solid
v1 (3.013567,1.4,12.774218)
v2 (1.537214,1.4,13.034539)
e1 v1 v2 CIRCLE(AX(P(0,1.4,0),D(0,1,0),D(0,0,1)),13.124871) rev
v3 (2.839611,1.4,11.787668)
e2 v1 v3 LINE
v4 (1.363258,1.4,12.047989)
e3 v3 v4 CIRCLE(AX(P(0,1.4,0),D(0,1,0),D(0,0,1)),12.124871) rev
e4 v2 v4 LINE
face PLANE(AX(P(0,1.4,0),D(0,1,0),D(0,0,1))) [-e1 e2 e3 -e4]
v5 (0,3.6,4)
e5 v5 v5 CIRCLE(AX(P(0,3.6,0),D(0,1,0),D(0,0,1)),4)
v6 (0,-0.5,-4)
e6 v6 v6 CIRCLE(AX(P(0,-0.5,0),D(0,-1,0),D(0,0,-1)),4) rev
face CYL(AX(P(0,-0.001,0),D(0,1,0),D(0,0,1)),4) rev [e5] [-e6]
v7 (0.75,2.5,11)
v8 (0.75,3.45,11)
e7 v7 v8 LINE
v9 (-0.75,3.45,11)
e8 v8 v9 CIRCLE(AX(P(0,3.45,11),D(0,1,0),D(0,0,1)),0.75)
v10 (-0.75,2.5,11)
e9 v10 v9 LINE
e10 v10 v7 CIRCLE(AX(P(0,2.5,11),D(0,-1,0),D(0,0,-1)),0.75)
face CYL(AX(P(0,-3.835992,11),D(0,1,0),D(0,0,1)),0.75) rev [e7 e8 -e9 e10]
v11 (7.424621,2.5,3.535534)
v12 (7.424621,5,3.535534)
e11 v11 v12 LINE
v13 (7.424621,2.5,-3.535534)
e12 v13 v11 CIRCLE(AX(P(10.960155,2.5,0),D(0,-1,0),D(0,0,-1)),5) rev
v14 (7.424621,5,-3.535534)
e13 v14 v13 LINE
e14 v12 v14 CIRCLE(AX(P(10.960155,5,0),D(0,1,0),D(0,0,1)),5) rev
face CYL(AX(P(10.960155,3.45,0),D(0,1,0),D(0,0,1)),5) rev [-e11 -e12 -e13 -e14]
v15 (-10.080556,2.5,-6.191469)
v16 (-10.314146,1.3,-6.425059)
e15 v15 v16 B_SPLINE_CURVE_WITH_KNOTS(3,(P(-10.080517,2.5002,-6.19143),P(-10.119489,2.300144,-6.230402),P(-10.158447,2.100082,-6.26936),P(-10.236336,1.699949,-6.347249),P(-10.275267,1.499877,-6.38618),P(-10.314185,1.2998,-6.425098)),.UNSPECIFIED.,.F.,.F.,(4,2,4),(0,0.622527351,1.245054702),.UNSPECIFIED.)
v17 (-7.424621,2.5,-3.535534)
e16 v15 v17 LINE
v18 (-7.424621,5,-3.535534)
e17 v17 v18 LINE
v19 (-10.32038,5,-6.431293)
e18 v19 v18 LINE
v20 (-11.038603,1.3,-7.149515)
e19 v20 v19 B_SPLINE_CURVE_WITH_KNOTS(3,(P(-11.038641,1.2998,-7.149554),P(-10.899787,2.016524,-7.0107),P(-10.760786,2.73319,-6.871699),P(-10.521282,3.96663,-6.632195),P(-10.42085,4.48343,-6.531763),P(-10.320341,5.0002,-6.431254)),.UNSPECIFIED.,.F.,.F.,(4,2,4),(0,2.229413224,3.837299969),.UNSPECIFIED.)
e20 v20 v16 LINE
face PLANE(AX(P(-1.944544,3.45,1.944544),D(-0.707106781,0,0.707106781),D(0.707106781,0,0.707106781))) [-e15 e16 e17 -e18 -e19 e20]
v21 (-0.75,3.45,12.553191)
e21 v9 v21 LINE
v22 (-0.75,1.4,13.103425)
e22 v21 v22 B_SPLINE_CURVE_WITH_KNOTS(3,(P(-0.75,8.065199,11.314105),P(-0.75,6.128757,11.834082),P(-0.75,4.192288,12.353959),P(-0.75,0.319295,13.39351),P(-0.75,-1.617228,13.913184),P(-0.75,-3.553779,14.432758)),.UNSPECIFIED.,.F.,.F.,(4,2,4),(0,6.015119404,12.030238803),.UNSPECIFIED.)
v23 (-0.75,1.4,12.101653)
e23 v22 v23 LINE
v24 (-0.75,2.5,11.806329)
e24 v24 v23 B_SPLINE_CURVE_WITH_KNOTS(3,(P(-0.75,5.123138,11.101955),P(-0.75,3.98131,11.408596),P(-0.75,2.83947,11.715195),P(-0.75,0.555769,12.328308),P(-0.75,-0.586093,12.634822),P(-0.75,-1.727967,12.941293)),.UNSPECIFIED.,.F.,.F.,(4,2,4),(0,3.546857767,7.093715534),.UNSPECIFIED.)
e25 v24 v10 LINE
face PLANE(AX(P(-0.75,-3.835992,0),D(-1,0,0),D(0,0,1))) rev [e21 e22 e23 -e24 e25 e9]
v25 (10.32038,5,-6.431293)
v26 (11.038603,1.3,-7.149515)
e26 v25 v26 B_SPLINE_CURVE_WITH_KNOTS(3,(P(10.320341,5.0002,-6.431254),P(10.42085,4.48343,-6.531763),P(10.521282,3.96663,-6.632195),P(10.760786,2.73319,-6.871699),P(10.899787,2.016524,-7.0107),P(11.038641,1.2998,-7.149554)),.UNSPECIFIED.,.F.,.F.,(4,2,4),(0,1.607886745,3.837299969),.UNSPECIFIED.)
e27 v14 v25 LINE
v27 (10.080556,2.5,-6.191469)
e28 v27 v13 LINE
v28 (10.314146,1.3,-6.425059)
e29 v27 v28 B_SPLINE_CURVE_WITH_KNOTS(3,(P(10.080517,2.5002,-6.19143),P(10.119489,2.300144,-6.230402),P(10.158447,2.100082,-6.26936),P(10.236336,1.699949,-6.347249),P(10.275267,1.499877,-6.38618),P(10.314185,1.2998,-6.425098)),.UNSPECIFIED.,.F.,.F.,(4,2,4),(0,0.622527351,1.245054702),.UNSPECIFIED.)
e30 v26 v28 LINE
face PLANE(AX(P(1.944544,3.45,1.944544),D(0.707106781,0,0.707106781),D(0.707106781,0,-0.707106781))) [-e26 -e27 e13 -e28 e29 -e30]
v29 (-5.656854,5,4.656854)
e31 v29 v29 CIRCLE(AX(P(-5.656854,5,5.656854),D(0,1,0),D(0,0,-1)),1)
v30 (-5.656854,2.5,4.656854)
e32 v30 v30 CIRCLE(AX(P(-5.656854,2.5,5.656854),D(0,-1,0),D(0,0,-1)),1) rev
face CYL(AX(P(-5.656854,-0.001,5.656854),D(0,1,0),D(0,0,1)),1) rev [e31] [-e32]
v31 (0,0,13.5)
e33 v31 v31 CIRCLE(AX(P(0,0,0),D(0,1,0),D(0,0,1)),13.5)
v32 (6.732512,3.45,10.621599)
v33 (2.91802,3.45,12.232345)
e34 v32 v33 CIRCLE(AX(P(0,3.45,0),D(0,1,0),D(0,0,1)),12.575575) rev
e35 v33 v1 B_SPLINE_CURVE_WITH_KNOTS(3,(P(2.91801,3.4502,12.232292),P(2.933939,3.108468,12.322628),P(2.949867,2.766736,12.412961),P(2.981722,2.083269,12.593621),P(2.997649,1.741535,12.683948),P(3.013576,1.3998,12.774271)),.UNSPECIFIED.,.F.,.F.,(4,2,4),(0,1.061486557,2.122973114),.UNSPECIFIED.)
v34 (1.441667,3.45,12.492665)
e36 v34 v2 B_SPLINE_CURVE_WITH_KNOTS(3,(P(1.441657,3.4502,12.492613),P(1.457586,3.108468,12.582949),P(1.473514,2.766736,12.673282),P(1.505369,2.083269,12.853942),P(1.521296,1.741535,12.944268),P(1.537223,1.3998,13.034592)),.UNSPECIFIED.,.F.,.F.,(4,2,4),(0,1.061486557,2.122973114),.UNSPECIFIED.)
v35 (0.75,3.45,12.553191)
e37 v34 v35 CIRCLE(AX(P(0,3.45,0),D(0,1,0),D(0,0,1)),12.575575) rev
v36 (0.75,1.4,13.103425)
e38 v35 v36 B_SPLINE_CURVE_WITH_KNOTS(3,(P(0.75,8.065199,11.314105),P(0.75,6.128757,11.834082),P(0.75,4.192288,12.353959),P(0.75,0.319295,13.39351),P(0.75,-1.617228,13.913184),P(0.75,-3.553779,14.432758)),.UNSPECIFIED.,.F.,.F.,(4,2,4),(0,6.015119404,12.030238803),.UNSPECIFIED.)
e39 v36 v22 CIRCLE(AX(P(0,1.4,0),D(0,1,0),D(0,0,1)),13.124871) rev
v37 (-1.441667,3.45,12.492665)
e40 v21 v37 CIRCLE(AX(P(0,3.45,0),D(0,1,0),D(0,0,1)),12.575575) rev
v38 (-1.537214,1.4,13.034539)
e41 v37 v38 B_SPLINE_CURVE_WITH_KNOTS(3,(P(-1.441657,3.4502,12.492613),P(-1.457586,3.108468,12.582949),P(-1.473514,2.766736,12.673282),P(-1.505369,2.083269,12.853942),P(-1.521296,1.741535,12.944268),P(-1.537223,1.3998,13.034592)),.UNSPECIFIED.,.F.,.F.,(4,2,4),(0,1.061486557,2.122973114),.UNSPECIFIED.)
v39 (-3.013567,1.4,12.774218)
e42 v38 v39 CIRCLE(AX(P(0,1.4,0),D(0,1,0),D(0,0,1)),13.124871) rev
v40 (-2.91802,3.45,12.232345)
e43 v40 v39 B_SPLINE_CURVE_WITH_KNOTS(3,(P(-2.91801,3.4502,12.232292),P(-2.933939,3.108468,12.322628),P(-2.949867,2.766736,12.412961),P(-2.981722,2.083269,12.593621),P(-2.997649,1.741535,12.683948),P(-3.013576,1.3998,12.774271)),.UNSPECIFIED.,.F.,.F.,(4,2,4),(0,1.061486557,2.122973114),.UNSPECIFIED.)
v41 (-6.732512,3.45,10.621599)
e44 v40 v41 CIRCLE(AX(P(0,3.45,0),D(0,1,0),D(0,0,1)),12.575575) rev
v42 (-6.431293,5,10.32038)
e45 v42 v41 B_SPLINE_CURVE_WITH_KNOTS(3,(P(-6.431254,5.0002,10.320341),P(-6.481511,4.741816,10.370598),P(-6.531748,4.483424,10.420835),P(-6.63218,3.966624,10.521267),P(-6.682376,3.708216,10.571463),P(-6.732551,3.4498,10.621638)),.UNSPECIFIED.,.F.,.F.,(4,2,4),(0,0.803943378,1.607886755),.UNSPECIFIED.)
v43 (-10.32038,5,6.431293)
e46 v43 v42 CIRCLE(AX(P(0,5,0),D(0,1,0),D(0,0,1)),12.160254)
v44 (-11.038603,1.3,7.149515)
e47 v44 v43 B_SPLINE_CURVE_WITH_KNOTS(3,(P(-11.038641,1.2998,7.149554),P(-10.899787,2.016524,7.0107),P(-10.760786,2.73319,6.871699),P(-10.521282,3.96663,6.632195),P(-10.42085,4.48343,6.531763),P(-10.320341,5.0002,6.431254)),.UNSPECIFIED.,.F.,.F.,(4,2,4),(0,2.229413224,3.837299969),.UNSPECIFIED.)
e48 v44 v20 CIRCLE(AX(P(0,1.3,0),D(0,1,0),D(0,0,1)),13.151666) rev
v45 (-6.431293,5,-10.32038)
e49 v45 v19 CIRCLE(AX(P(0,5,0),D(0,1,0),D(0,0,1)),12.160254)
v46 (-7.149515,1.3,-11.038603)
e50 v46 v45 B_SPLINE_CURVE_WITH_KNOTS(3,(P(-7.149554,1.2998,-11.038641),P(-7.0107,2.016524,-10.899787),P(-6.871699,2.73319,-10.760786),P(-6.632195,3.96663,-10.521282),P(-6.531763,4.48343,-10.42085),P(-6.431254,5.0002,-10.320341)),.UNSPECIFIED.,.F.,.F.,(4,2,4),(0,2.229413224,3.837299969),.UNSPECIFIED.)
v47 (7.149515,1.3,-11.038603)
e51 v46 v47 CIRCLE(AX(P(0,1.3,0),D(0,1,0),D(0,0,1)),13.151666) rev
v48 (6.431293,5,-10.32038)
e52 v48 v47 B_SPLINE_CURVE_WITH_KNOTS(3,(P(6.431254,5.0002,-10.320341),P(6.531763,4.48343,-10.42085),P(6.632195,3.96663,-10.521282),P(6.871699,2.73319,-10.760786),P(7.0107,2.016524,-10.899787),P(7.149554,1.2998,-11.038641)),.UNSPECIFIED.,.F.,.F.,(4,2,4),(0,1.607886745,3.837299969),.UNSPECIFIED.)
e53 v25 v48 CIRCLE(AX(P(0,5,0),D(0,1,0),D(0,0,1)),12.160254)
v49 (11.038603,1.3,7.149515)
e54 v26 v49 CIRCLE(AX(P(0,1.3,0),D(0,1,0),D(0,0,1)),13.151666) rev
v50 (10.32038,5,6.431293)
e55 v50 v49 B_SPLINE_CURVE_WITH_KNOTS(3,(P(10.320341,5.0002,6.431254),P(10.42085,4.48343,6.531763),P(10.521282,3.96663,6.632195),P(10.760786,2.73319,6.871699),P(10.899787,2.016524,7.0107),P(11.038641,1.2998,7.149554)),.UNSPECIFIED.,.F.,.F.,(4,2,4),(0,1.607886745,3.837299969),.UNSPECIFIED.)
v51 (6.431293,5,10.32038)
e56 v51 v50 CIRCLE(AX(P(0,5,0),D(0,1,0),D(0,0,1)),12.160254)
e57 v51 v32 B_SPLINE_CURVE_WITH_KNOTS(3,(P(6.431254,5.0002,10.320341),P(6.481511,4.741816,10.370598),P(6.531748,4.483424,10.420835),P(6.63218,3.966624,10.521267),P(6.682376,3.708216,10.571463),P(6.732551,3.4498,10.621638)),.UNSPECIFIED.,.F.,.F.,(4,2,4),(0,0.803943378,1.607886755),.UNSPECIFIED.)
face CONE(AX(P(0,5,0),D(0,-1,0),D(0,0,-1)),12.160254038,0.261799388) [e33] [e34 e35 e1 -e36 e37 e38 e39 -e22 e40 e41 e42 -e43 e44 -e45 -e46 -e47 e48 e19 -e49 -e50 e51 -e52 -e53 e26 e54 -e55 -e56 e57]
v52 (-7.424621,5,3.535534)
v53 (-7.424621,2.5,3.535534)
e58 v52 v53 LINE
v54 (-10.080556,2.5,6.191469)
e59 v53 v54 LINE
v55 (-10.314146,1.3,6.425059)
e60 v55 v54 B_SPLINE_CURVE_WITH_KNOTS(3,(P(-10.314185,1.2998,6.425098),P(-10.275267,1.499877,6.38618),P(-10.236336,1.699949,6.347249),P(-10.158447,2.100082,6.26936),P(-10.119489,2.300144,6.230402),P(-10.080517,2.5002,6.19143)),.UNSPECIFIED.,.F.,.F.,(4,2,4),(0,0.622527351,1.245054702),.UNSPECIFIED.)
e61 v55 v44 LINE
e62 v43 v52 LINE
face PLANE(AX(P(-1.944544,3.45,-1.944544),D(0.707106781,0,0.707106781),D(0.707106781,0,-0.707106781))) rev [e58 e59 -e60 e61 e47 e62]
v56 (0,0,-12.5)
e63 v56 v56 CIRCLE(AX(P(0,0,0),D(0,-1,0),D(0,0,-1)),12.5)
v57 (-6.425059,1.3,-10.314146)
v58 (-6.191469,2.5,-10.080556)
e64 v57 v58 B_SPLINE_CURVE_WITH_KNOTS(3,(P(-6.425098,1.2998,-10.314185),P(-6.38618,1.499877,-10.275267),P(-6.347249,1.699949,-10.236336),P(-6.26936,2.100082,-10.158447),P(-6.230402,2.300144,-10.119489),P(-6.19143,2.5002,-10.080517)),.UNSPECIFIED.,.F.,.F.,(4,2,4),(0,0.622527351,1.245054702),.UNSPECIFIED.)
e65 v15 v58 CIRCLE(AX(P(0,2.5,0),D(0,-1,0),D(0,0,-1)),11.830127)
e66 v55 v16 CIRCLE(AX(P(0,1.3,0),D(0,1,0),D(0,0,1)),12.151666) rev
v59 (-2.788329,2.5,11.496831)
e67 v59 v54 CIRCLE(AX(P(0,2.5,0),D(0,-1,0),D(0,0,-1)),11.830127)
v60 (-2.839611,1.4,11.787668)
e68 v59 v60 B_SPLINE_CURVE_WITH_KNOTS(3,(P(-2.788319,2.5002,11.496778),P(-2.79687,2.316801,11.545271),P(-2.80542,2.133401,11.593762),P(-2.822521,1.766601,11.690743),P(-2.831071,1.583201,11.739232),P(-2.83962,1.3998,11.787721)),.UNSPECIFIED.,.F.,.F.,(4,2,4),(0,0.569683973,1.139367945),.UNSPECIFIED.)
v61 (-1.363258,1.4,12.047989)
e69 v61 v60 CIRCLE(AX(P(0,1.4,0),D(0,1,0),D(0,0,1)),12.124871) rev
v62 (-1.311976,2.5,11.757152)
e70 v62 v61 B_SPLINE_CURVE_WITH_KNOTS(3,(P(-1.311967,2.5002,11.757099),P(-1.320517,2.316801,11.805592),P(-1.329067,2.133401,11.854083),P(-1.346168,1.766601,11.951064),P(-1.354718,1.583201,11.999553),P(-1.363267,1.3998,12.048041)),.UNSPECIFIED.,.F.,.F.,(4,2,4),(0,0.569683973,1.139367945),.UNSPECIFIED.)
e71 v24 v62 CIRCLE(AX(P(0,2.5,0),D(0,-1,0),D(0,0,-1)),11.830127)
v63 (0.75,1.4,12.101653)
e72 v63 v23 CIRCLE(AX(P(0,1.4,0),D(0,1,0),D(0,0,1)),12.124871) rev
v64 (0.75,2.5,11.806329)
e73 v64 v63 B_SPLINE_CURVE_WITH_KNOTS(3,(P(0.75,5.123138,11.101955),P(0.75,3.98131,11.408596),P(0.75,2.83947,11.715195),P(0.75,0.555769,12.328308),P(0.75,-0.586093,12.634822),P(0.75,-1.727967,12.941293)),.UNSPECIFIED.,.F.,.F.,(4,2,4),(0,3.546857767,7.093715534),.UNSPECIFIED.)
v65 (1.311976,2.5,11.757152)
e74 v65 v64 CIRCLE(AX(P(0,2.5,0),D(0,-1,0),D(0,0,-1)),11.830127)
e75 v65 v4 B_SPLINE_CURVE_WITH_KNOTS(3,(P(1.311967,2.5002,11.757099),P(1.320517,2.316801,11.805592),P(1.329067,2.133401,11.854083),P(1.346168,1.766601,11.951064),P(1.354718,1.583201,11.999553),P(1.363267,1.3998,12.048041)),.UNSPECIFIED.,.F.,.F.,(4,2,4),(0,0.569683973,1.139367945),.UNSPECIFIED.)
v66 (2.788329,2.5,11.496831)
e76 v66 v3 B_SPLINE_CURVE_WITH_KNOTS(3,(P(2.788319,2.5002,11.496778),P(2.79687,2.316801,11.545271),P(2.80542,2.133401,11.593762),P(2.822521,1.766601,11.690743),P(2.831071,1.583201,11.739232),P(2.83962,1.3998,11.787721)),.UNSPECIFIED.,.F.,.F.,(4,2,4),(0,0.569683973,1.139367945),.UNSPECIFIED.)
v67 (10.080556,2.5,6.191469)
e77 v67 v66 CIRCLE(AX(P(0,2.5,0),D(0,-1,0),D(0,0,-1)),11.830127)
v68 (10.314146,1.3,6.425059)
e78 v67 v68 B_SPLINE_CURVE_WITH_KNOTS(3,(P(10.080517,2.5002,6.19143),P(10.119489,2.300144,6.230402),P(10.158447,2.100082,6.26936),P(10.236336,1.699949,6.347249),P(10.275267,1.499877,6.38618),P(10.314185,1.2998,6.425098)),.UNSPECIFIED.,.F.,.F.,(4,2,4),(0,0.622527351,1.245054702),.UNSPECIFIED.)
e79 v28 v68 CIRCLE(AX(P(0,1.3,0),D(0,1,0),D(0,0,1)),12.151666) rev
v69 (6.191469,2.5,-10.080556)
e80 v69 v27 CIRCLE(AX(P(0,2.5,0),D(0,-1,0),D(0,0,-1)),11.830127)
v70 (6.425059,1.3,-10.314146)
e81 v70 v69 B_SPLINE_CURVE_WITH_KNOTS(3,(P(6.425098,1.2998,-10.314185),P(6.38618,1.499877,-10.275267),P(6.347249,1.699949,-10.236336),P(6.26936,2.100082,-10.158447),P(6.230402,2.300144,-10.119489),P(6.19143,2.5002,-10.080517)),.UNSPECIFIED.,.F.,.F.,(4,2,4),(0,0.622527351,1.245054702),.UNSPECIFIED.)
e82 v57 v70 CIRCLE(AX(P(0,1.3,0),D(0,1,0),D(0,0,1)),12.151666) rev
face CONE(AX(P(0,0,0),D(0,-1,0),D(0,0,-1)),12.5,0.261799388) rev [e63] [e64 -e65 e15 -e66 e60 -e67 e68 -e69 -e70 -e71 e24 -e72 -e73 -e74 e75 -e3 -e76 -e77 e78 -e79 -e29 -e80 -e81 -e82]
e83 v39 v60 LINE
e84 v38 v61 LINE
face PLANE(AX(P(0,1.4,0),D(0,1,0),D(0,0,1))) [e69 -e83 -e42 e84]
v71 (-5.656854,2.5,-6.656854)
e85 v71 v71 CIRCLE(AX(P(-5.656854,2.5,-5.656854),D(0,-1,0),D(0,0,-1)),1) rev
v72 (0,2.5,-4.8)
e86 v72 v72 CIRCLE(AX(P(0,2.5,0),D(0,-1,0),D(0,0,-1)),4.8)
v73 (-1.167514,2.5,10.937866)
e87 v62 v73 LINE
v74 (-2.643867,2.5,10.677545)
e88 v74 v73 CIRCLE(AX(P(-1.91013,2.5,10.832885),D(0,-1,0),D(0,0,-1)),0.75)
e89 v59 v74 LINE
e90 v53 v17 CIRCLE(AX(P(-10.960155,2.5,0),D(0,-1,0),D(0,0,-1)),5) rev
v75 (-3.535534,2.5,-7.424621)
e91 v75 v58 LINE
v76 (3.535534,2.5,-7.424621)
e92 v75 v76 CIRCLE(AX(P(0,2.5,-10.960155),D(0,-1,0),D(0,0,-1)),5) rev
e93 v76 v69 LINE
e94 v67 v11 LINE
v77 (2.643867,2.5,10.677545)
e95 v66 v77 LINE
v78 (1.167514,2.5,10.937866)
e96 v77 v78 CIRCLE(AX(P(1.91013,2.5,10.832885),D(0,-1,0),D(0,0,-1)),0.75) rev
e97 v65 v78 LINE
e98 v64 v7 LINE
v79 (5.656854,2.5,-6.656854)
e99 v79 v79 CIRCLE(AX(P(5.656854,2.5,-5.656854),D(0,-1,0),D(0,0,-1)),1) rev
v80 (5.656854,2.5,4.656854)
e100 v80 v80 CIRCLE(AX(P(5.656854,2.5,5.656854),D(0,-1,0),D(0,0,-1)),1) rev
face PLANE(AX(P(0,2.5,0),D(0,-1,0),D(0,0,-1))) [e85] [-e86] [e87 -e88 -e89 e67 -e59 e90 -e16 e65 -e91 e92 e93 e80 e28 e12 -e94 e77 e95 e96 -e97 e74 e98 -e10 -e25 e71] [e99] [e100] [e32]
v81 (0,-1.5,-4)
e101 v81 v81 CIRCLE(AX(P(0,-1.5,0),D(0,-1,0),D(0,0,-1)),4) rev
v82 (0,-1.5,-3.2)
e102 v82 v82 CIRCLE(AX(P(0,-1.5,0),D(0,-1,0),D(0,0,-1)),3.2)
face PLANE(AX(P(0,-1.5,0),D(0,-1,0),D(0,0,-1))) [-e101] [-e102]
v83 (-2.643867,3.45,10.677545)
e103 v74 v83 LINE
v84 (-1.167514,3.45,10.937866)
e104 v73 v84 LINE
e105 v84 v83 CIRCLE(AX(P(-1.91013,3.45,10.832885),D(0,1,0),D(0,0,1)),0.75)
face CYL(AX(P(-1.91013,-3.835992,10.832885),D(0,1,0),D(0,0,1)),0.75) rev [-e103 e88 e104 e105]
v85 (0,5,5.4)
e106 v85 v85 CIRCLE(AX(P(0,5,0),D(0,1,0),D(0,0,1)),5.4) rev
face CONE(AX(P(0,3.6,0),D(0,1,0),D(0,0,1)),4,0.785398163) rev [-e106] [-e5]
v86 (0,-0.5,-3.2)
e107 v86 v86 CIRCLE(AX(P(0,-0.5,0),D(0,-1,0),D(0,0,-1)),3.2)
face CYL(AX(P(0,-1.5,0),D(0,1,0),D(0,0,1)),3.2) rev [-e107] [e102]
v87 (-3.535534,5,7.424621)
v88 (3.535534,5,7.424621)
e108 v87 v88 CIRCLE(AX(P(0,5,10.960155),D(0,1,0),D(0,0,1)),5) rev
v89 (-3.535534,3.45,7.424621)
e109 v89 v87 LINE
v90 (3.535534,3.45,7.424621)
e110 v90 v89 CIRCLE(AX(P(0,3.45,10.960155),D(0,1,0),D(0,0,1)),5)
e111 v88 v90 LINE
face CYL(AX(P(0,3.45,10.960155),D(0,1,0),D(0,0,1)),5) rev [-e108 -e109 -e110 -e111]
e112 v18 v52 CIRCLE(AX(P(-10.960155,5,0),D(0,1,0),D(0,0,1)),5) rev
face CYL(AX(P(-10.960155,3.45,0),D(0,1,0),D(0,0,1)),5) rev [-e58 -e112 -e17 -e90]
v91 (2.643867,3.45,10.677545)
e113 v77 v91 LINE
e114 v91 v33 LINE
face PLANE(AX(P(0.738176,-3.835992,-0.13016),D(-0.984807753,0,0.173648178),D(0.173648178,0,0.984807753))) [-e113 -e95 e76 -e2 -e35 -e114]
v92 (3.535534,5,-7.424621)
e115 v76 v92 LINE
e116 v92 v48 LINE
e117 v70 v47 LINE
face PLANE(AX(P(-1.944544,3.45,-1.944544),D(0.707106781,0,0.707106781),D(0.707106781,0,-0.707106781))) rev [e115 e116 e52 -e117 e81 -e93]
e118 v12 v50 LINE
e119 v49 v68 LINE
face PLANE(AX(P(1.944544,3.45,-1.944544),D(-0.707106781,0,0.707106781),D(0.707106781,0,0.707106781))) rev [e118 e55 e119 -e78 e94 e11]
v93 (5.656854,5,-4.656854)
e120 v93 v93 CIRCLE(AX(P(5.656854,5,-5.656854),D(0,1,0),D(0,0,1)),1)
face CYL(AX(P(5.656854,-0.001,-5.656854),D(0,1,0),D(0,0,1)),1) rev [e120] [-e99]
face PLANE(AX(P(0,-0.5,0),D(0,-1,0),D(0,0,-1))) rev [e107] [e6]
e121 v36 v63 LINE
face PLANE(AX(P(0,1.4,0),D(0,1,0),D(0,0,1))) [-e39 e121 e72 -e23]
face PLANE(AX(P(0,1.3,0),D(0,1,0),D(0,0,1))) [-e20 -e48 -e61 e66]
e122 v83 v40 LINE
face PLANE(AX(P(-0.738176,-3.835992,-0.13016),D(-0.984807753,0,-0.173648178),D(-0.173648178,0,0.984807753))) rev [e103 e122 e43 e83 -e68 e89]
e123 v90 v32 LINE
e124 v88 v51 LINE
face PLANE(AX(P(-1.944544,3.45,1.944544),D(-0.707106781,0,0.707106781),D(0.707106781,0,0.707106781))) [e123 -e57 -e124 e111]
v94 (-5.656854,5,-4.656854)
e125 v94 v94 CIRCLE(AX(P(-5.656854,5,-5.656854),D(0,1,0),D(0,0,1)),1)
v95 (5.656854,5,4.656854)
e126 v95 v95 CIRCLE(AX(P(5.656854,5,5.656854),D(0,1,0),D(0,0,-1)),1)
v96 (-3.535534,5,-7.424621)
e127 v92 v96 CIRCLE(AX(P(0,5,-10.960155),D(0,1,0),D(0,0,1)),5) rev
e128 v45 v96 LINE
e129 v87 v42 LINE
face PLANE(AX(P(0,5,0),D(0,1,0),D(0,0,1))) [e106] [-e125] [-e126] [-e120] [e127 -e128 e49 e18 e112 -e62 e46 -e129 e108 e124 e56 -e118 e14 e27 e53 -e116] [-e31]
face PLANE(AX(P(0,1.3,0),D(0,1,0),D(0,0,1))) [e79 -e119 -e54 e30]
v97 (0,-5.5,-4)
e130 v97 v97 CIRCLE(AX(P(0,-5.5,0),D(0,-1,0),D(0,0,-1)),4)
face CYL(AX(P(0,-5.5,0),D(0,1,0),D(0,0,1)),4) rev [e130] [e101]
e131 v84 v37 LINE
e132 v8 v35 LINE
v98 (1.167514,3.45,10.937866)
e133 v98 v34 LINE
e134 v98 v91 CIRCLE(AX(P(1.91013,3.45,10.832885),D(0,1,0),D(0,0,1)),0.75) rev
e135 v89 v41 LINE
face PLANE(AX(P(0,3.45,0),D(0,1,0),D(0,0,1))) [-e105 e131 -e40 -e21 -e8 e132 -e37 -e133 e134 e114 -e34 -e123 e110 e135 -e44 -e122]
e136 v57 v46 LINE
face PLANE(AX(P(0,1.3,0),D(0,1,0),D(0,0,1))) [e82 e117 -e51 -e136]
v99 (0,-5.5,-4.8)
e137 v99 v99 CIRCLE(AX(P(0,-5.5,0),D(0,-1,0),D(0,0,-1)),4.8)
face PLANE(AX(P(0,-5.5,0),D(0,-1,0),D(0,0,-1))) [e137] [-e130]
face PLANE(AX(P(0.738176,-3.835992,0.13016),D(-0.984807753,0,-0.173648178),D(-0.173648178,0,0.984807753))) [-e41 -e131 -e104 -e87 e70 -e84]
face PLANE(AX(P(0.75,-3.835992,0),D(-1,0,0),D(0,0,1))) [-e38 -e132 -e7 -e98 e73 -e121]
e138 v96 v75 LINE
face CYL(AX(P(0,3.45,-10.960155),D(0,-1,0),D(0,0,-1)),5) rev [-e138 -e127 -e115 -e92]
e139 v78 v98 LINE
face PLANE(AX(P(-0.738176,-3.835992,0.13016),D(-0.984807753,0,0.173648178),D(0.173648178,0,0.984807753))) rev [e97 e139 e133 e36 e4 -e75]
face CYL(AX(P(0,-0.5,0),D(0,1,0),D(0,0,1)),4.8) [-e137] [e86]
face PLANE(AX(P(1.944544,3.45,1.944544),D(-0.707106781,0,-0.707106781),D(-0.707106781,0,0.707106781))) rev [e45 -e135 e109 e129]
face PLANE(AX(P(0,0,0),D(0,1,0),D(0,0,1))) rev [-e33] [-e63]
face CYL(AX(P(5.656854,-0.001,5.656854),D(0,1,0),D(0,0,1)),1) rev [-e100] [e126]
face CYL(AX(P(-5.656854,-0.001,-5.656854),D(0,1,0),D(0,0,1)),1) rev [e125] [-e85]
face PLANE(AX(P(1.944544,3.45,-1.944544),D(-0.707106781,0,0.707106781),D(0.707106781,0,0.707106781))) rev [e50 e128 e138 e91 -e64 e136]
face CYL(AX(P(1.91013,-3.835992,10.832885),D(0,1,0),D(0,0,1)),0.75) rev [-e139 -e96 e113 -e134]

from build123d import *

# Parameters (mm, degrees)
SKETCH1_R                   = 13.5
BASE_SIZE_DEPTH             = 5
MOUNTING_HOLES_REACH        = 21.736
SKETCH2_R                   = 1
SKETCH3_R                   = 12.5
ROTOR_POCKET_DEPTH          = 2.5
ROTOR_POCKET_DRAFT          = -15
OUTSIDE_CHAMFER_SIZE        = 5
OUTSIDE_CHAMFER_SIZE_2      = 1.339745962
BOTTOM_POCKETS_TOP_DEPTH    = 1.55
BOTTOM_POCKETS_BOTTOM_DEPTH = 2.15
BOTTOM_POCKETS_FILLET_R     = 5
CUT_EXTRUDE5_REACH          = 21.736
SKETCH6_R                   = 4
CHAMFER2_SIZE               = 1.4
SKETCH7_R                   = 4.8
SKETCH7_R_2                 = 4
BEARING_BOTTOM_DEPTH        = 3
SKETCH8_R                   = 4.8
SKETCH8_R_2                 = 3.2
BEARING_SEPARATOR_DEPTH     = 1
SKETCH9_R                   = 4.8
SKETCH9_R_2                 = 4
BEARING_TOP_DEPTH           = 4
CUT_EXTRUDE6_DEPTH          = 2.05


with BuildPart() as part:
    # Sketch1 → Base size (new body)
    with BuildSketch(Plane(origin=(0, 0, 0), x_dir=(1, 0, 0), z_dir=(0, 1, 0))):
        with Locations(Location((0, 0, 0), (0, 0, 270))):
            Circle(SKETCH1_R)
    extrude(amount=BASE_SIZE_DEPTH)

    # Sketch2 → Mounting holes (cut, up to next)
    with BuildSketch(Plane(origin=(0, 5, 0), x_dir=(1, 0, 0), z_dir=(0, 1, 0)), mode=Mode.PRIVATE) as mounting_holes_sk1:
        with Locations(Location((5.656854249, 5.656854249, 0), (0, 0, 270))):
            Circle(SKETCH2_R)
    mounting_holes_tool1 = extrude(mounting_holes_sk1.sketch, amount=-MOUNTING_HOLES_REACH, mode=Mode.PRIVATE) & part.part
    # Sketch2 → Mounting holes (cut, up to next)
    with BuildSketch(Plane(origin=(0, 5, 0), x_dir=(1, 0, 0), z_dir=(0, 1, 0)), mode=Mode.PRIVATE) as mounting_holes_sk2:
        with Locations(Location((-5.656854249, -5.656854249, 0), (0, 0, 270))):
            Circle(SKETCH2_R)
    mounting_holes_tool2 = extrude(mounting_holes_sk2.sketch, amount=-MOUNTING_HOLES_REACH, mode=Mode.PRIVATE) & part.part
    # Sketch2 → Mounting holes (cut, up to next)
    with BuildSketch(Plane(origin=(0, 5, 0), x_dir=(1, 0, 0), z_dir=(0, 1, 0)), mode=Mode.PRIVATE) as mounting_holes_sk3:
        with Locations(Location((5.656854249, -5.656854249, 0), (0, 0, 270))):
            Circle(SKETCH2_R)
    mounting_holes_tool3 = extrude(mounting_holes_sk3.sketch, amount=-MOUNTING_HOLES_REACH, mode=Mode.PRIVATE) & part.part
    # Sketch2 → Mounting holes (cut, up to next)
    with BuildSketch(Plane(origin=(0, 5, 0), x_dir=(1, 0, 0), z_dir=(0, 1, 0)), mode=Mode.PRIVATE) as mounting_holes_sk4:
        with Locations(Location((-5.656854249, 5.656854249, 0), (0, 0, 270))):
            Circle(SKETCH2_R)
    mounting_holes_tool4 = extrude(mounting_holes_sk4.sketch, amount=-MOUNTING_HOLES_REACH, mode=Mode.PRIVATE) & part.part
    add(mounting_holes_tool1.solids().sort_by_distance((5.656854, 5, -5.656854))[0], mode=Mode.SUBTRACT)
    add(mounting_holes_tool2.solids().sort_by_distance((-5.656854, 5, 5.656854))[0], mode=Mode.SUBTRACT)
    add(mounting_holes_tool3.solids().sort_by_distance((5.656854, 5, 5.656854))[0], mode=Mode.SUBTRACT)
    add(mounting_holes_tool4.solids().sort_by_distance((-5.656854, 5, -5.656854))[0], mode=Mode.SUBTRACT)


with BuildPart() as rotor_pocket_tool:
    # Sketch3 → Rotor pocket (with draft: the straight prism first)
    with BuildSketch(Plane.XZ):
        Circle(SKETCH3_R)
    extrude(amount=-ROTOR_POCKET_DEPTH)
    # Rotor pocket: the draft: its side faces are tilted about the plane it starts from
    rotor_pocket_sides = [rotor_pocket_tool.faces().sort_by_distance(p)[0] for p in [
        (-12.5, 1.25, 0),
    ]]
    draft(rotor_pocket_sides, Plane.XZ, ROTOR_POCKET_DRAFT)


with BuildPart() as part_1:
    add(part.part)

    # Rotor pocket: cut by rotor_pocket_tool
    add(rotor_pocket_tool.part, mode=Mode.SUBTRACT)

    # Outside chamfer
    # the kernel refuses this chamfer: 5, 1.339745962 mm, written as the material it takes off along each edge
    with BuildSketch(Plane(origin=(0, 5, 0), x_dir=(0, 0, 1), z_dir=(-1, 0, 0))) as outside_chamfer_piece_1:
        Polygon((13.5, -OUTSIDE_CHAMFER_SIZE), (13.5 - OUTSIDE_CHAMFER_SIZE_2, 0), (13.5, 0), align=None)
    revolve(axis=Axis((0, 5, 0), (0, 1, 0)), mode=Mode.SUBTRACT)

    # Sketch4 → Bottom pockets top (cut)
    with BuildSketch(Plane(origin=(0, 5, 0), x_dir=(1, 0, 0), z_dir=(0, 1, 0))):
        with BuildLine():
            Line((-3.889087297, 0), (-10.320380271, 6.431292975))
            ThreePointArc((-10.320380271, 6.431292975), (-12.160254038, 0), (-10.320380271, -6.431292975))
            Line((-10.320380271, -6.431292975), (-3.889087297, 0))
        make_face()
        with BuildLine():
            Line((-10.320380271, 6.431292975), (-10.543141739, 6.654054443))
            Line((-10.543141739, 6.654054443), (-11.29033147, 7.401244173))
            ThreePointArc((-11.29033147, 7.401244173), (-13.5, 0), (-11.29033147, -7.401244173))
            Line((-11.29033147, -7.401244173), (-10.543141739, -6.654054443))
            Line((-10.543141739, -6.654054443), (-10.320380271, -6.431292975))
            ThreePointArc((-10.320380271, -6.431292975), (-12.160254038, 0), (-10.320380271, 6.431292975))
        make_face()
        with BuildLine():
            ThreePointArc((6.431292975, 10.320380271), (0, 12.160254038), (-6.431292975, 10.320380271))
            Line((-6.431292975, 10.320380271), (0, 3.889087297))
            Line((0, 3.889087297), (6.431292975, 10.320380271))
        make_face()
        with BuildLine():
            Line((-6.654054443, 10.543141739), (-6.431292975, 10.320380271))
            ThreePointArc((-6.431292975, 10.320380271), (0, 12.160254038), (6.431292975, 10.320380271))
            Line((6.431292975, 10.320380271), (6.654054443, 10.543141739))
            Line((6.654054443, 10.543141739), (7.401244173, 11.29033147))
            ThreePointArc((7.401244173, 11.29033147), (0, 13.5), (-7.401244173, 11.29033147))
            Line((-7.401244173, 11.29033147), (-6.654054443, 10.543141739))
        make_face()
        with BuildLine():
            Line((10.320380271, 6.431292975), (3.889087297, 0))
            Line((3.889087297, 0), (10.320380271, -6.431292975))
            ThreePointArc((10.320380271, -6.431292975), (11.691240827, -3.344647396), (12.160254038, 0))
            ThreePointArc((12.160254038, 0), (11.691240827, 3.344647396), (10.320380271, 6.431292975))
        make_face()
        with BuildLine():
            Line((10.543141739, 6.654054443), (10.320380271, 6.431292975))
            ThreePointArc((10.320380271, 6.431292975), (11.691240827, 3.344647396), (12.160254038, 0))
            ThreePointArc((12.160254038, 0), (11.691240827, -3.344647396), (10.320380271, -6.431292975))
            Line((10.320380271, -6.431292975), (10.543141739, -6.654054443))
            Line((10.543141739, -6.654054443), (11.29033147, -7.401244173))
            ThreePointArc((11.29033147, -7.401244173), (12.935792879, -3.862028299), (13.5, 0))
            ThreePointArc((13.5, 0), (12.935792879, 3.862028299), (11.29033147, 7.401244173))
            Line((11.29033147, 7.401244173), (10.543141739, 6.654054443))
        make_face()
        with BuildLine():
            ThreePointArc((6.431292975, -10.320380271), (0, -12.160254038), (-6.431292975, -10.320380271))
            Line((-6.431292975, -10.320380271), (-6.654054443, -10.543141739))
            Line((-6.654054443, -10.543141739), (-7.401244173, -11.29033147))
            ThreePointArc((-7.401244173, -11.29033147), (0, -13.5), (7.401244173, -11.29033147))
            Line((7.401244173, -11.29033147), (6.654054443, -10.543141739))
            Line((6.654054443, -10.543141739), (6.431292975, -10.320380271))
        make_face()
        with BuildLine():
            Line((6.431292975, -10.320380271), (0, -3.889087297))
            Line((0, -3.889087297), (-6.431292975, -10.320380271))
            ThreePointArc((-6.431292975, -10.320380271), (0, -12.160254038), (6.431292975, -10.320380271))
        make_face()
    extrude(amount=-BOTTOM_POCKETS_TOP_DEPTH, mode=Mode.SUBTRACT)

    # Sketch5 → Bottom pockets bottom (cut)
    with BuildSketch(Plane(origin=(0, 3.45, 0), x_dir=(1, 0, 0), z_dir=(0, 1, 0))):
        with BuildLine():
            ThreePointArc((-10.621599421, 6.732512125), (-12.575575286, 0), (-10.621599421, -6.732512125))
            Line((-10.621599421, -6.732512125), (-3.889087297, 0))
            Line((-3.889087297, 0), (-10.621599421, 6.732512125))
        make_face()
        with BuildLine():
            Line((-10.621599421, 6.732512125), (-11.29033147, 7.401244173))
            ThreePointArc((-11.29033147, 7.401244173), (-13.5, 0), (-11.29033147, -7.401244173))
            Line((-11.29033147, -7.401244173), (-10.621599421, -6.732512125))
            ThreePointArc((-10.621599421, -6.732512125), (-12.575575286, 0), (-10.621599421, 6.732512125))
        make_face()
        with BuildLine():
            ThreePointArc((7.401244173, 11.29033147), (0, 13.5), (-7.401244173, 11.29033147))
            Line((-7.401244173, 11.29033147), (0, 3.889087297))
            Line((0, 3.889087297), (7.401244173, 11.29033147))
        make_face()
        with BuildLine():
            Line((11.29033147, 7.401244173), (3.889087297, 0))
            Line((3.889087297, 0), (11.29033147, -7.401244173))
            ThreePointArc((11.29033147, -7.401244173), (12.935792879, -3.862028299), (13.5, 0))
            ThreePointArc((13.5, 0), (12.935792879, 3.862028299), (11.29033147, 7.401244173))
        make_face()
    extrude(amount=-BOTTOM_POCKETS_BOTTOM_DEPTH, mode=Mode.SUBTRACT)

    # Bottom pockets fillet
    bottom_pockets_fillet_edges = [part_1.edges().sort_by_distance(p)[0] for p in [
        (-3.889087297, 3.75, 0),
        (3.889087297, 3.75, 0),
        (0, 4.225, 3.889087297),
        (0, 3.75, -3.889087297),
    ]]
    fillet(bottom_pockets_fillet_edges, radius=BOTTOM_POCKETS_FILLET_R)

    # Sketch6 → Cut-Extrude5 (cut, up to next)
    with BuildSketch(Plane(origin=(0, 5, 0), x_dir=(1, 0, 0), z_dir=(0, 1, 0)), mode=Mode.PRIVATE) as cut_extrude5_sk1:
        with Locations(Location((0, 0, 0), (0, 0, 270))):
            Circle(SKETCH6_R)
    cut_extrude5_tool1 = extrude(cut_extrude5_sk1.sketch, amount=-CUT_EXTRUDE5_REACH, mode=Mode.PRIVATE) & part_1.part
    add(cut_extrude5_tool1.solids().sort_by_distance((0, 5, 0))[0], mode=Mode.SUBTRACT)

    # Chamfer2
    chamfer2_edges = [part_1.edges().sort_by_distance(p)[0] for p in [
        (0, 5, -4),
    ]]
    chamfer(chamfer2_edges, length=CHAMFER2_SIZE)

    # Sketch7 → Bearing bottom (add)
    with BuildSketch(Plane.XZ.offset(-2.5)):
        with Locations(Location((0, 0, 0), (0, 0, 270))):
            Circle(SKETCH7_R)
        with Locations(Location((0, 0, 0), (0, 0, 90))):
            Circle(SKETCH7_R_2, mode=Mode.SUBTRACT)
    extrude(amount=BEARING_BOTTOM_DEPTH)

    # Sketch8 → Bearing separator (add)
    with BuildSketch(Plane.XZ.offset(0.5)):
        with Locations(Location((0, 0, 0), (0, 0, 270))):
            Circle(SKETCH8_R)
        with Locations(Location((0, 0, 0), (0, 0, 270))):
            Circle(SKETCH8_R_2, mode=Mode.SUBTRACT)
    extrude(amount=BEARING_SEPARATOR_DEPTH)

    # Sketch9 → Bearing top (add)
    with BuildSketch(Plane.XZ.offset(1.5)):
        with Locations(Location((0, 0, 0), (0, 0, 270))):
            Circle(SKETCH9_R)
        with Locations(Location((0, 0, 0), (0, 0, 90))):
            Circle(SKETCH9_R_2, mode=Mode.SUBTRACT)
    extrude(amount=BEARING_TOP_DEPTH)

    # Sketch10 → Cut-Extrude6 (cut)
    with BuildSketch(Plane(origin=(0, 3.45, 0), x_dir=(1, 0, 0), z_dir=(0, 1, 0))):
        with BuildLine():
            ThreePointArc((-1.167513596, -10.937865971), (-1.779893821, -10.094279468), (-2.643866576, -10.677545108))
            Line((-2.643866576, -10.677545108), (-3.078810633, -13.144235432))
            ThreePointArc((-3.078810633, -13.144235432), (-2.344250399, -13.294904666), (-1.602457654, -13.404556295))
            Line((-1.602457654, -13.404556295), (-1.167513596, -10.937865971))
        make_face()
        with BuildLine():
            ThreePointArc((2.643866576, -10.677545108), (1.779893821, -10.094279468), (1.167513596, -10.937865971))
            Line((1.167513596, -10.937865971), (1.602457654, -13.404556295))
            ThreePointArc((1.602457654, -13.404556295), (2.344250399, -13.294904666), (3.078810633, -13.144235432))
            Line((3.078810633, -13.144235432), (2.643866576, -10.677545108))
        make_face()
        with BuildLine():
            Line((-0.75, -11), (-0.75, -13.479150567))
            ThreePointArc((-0.75, -13.479150567), (0, -13.5), (0.75, -13.479150567))
            Line((0.75, -13.479150567), (0.75, -11))
            ThreePointArc((0.75, -11), (0, -10.25), (-0.75, -11))
        make_face()
    extrude(amount=-CUT_EXTRUDE6_DEPTH, mode=Mode.SUBTRACT)


solid = part_1.part
